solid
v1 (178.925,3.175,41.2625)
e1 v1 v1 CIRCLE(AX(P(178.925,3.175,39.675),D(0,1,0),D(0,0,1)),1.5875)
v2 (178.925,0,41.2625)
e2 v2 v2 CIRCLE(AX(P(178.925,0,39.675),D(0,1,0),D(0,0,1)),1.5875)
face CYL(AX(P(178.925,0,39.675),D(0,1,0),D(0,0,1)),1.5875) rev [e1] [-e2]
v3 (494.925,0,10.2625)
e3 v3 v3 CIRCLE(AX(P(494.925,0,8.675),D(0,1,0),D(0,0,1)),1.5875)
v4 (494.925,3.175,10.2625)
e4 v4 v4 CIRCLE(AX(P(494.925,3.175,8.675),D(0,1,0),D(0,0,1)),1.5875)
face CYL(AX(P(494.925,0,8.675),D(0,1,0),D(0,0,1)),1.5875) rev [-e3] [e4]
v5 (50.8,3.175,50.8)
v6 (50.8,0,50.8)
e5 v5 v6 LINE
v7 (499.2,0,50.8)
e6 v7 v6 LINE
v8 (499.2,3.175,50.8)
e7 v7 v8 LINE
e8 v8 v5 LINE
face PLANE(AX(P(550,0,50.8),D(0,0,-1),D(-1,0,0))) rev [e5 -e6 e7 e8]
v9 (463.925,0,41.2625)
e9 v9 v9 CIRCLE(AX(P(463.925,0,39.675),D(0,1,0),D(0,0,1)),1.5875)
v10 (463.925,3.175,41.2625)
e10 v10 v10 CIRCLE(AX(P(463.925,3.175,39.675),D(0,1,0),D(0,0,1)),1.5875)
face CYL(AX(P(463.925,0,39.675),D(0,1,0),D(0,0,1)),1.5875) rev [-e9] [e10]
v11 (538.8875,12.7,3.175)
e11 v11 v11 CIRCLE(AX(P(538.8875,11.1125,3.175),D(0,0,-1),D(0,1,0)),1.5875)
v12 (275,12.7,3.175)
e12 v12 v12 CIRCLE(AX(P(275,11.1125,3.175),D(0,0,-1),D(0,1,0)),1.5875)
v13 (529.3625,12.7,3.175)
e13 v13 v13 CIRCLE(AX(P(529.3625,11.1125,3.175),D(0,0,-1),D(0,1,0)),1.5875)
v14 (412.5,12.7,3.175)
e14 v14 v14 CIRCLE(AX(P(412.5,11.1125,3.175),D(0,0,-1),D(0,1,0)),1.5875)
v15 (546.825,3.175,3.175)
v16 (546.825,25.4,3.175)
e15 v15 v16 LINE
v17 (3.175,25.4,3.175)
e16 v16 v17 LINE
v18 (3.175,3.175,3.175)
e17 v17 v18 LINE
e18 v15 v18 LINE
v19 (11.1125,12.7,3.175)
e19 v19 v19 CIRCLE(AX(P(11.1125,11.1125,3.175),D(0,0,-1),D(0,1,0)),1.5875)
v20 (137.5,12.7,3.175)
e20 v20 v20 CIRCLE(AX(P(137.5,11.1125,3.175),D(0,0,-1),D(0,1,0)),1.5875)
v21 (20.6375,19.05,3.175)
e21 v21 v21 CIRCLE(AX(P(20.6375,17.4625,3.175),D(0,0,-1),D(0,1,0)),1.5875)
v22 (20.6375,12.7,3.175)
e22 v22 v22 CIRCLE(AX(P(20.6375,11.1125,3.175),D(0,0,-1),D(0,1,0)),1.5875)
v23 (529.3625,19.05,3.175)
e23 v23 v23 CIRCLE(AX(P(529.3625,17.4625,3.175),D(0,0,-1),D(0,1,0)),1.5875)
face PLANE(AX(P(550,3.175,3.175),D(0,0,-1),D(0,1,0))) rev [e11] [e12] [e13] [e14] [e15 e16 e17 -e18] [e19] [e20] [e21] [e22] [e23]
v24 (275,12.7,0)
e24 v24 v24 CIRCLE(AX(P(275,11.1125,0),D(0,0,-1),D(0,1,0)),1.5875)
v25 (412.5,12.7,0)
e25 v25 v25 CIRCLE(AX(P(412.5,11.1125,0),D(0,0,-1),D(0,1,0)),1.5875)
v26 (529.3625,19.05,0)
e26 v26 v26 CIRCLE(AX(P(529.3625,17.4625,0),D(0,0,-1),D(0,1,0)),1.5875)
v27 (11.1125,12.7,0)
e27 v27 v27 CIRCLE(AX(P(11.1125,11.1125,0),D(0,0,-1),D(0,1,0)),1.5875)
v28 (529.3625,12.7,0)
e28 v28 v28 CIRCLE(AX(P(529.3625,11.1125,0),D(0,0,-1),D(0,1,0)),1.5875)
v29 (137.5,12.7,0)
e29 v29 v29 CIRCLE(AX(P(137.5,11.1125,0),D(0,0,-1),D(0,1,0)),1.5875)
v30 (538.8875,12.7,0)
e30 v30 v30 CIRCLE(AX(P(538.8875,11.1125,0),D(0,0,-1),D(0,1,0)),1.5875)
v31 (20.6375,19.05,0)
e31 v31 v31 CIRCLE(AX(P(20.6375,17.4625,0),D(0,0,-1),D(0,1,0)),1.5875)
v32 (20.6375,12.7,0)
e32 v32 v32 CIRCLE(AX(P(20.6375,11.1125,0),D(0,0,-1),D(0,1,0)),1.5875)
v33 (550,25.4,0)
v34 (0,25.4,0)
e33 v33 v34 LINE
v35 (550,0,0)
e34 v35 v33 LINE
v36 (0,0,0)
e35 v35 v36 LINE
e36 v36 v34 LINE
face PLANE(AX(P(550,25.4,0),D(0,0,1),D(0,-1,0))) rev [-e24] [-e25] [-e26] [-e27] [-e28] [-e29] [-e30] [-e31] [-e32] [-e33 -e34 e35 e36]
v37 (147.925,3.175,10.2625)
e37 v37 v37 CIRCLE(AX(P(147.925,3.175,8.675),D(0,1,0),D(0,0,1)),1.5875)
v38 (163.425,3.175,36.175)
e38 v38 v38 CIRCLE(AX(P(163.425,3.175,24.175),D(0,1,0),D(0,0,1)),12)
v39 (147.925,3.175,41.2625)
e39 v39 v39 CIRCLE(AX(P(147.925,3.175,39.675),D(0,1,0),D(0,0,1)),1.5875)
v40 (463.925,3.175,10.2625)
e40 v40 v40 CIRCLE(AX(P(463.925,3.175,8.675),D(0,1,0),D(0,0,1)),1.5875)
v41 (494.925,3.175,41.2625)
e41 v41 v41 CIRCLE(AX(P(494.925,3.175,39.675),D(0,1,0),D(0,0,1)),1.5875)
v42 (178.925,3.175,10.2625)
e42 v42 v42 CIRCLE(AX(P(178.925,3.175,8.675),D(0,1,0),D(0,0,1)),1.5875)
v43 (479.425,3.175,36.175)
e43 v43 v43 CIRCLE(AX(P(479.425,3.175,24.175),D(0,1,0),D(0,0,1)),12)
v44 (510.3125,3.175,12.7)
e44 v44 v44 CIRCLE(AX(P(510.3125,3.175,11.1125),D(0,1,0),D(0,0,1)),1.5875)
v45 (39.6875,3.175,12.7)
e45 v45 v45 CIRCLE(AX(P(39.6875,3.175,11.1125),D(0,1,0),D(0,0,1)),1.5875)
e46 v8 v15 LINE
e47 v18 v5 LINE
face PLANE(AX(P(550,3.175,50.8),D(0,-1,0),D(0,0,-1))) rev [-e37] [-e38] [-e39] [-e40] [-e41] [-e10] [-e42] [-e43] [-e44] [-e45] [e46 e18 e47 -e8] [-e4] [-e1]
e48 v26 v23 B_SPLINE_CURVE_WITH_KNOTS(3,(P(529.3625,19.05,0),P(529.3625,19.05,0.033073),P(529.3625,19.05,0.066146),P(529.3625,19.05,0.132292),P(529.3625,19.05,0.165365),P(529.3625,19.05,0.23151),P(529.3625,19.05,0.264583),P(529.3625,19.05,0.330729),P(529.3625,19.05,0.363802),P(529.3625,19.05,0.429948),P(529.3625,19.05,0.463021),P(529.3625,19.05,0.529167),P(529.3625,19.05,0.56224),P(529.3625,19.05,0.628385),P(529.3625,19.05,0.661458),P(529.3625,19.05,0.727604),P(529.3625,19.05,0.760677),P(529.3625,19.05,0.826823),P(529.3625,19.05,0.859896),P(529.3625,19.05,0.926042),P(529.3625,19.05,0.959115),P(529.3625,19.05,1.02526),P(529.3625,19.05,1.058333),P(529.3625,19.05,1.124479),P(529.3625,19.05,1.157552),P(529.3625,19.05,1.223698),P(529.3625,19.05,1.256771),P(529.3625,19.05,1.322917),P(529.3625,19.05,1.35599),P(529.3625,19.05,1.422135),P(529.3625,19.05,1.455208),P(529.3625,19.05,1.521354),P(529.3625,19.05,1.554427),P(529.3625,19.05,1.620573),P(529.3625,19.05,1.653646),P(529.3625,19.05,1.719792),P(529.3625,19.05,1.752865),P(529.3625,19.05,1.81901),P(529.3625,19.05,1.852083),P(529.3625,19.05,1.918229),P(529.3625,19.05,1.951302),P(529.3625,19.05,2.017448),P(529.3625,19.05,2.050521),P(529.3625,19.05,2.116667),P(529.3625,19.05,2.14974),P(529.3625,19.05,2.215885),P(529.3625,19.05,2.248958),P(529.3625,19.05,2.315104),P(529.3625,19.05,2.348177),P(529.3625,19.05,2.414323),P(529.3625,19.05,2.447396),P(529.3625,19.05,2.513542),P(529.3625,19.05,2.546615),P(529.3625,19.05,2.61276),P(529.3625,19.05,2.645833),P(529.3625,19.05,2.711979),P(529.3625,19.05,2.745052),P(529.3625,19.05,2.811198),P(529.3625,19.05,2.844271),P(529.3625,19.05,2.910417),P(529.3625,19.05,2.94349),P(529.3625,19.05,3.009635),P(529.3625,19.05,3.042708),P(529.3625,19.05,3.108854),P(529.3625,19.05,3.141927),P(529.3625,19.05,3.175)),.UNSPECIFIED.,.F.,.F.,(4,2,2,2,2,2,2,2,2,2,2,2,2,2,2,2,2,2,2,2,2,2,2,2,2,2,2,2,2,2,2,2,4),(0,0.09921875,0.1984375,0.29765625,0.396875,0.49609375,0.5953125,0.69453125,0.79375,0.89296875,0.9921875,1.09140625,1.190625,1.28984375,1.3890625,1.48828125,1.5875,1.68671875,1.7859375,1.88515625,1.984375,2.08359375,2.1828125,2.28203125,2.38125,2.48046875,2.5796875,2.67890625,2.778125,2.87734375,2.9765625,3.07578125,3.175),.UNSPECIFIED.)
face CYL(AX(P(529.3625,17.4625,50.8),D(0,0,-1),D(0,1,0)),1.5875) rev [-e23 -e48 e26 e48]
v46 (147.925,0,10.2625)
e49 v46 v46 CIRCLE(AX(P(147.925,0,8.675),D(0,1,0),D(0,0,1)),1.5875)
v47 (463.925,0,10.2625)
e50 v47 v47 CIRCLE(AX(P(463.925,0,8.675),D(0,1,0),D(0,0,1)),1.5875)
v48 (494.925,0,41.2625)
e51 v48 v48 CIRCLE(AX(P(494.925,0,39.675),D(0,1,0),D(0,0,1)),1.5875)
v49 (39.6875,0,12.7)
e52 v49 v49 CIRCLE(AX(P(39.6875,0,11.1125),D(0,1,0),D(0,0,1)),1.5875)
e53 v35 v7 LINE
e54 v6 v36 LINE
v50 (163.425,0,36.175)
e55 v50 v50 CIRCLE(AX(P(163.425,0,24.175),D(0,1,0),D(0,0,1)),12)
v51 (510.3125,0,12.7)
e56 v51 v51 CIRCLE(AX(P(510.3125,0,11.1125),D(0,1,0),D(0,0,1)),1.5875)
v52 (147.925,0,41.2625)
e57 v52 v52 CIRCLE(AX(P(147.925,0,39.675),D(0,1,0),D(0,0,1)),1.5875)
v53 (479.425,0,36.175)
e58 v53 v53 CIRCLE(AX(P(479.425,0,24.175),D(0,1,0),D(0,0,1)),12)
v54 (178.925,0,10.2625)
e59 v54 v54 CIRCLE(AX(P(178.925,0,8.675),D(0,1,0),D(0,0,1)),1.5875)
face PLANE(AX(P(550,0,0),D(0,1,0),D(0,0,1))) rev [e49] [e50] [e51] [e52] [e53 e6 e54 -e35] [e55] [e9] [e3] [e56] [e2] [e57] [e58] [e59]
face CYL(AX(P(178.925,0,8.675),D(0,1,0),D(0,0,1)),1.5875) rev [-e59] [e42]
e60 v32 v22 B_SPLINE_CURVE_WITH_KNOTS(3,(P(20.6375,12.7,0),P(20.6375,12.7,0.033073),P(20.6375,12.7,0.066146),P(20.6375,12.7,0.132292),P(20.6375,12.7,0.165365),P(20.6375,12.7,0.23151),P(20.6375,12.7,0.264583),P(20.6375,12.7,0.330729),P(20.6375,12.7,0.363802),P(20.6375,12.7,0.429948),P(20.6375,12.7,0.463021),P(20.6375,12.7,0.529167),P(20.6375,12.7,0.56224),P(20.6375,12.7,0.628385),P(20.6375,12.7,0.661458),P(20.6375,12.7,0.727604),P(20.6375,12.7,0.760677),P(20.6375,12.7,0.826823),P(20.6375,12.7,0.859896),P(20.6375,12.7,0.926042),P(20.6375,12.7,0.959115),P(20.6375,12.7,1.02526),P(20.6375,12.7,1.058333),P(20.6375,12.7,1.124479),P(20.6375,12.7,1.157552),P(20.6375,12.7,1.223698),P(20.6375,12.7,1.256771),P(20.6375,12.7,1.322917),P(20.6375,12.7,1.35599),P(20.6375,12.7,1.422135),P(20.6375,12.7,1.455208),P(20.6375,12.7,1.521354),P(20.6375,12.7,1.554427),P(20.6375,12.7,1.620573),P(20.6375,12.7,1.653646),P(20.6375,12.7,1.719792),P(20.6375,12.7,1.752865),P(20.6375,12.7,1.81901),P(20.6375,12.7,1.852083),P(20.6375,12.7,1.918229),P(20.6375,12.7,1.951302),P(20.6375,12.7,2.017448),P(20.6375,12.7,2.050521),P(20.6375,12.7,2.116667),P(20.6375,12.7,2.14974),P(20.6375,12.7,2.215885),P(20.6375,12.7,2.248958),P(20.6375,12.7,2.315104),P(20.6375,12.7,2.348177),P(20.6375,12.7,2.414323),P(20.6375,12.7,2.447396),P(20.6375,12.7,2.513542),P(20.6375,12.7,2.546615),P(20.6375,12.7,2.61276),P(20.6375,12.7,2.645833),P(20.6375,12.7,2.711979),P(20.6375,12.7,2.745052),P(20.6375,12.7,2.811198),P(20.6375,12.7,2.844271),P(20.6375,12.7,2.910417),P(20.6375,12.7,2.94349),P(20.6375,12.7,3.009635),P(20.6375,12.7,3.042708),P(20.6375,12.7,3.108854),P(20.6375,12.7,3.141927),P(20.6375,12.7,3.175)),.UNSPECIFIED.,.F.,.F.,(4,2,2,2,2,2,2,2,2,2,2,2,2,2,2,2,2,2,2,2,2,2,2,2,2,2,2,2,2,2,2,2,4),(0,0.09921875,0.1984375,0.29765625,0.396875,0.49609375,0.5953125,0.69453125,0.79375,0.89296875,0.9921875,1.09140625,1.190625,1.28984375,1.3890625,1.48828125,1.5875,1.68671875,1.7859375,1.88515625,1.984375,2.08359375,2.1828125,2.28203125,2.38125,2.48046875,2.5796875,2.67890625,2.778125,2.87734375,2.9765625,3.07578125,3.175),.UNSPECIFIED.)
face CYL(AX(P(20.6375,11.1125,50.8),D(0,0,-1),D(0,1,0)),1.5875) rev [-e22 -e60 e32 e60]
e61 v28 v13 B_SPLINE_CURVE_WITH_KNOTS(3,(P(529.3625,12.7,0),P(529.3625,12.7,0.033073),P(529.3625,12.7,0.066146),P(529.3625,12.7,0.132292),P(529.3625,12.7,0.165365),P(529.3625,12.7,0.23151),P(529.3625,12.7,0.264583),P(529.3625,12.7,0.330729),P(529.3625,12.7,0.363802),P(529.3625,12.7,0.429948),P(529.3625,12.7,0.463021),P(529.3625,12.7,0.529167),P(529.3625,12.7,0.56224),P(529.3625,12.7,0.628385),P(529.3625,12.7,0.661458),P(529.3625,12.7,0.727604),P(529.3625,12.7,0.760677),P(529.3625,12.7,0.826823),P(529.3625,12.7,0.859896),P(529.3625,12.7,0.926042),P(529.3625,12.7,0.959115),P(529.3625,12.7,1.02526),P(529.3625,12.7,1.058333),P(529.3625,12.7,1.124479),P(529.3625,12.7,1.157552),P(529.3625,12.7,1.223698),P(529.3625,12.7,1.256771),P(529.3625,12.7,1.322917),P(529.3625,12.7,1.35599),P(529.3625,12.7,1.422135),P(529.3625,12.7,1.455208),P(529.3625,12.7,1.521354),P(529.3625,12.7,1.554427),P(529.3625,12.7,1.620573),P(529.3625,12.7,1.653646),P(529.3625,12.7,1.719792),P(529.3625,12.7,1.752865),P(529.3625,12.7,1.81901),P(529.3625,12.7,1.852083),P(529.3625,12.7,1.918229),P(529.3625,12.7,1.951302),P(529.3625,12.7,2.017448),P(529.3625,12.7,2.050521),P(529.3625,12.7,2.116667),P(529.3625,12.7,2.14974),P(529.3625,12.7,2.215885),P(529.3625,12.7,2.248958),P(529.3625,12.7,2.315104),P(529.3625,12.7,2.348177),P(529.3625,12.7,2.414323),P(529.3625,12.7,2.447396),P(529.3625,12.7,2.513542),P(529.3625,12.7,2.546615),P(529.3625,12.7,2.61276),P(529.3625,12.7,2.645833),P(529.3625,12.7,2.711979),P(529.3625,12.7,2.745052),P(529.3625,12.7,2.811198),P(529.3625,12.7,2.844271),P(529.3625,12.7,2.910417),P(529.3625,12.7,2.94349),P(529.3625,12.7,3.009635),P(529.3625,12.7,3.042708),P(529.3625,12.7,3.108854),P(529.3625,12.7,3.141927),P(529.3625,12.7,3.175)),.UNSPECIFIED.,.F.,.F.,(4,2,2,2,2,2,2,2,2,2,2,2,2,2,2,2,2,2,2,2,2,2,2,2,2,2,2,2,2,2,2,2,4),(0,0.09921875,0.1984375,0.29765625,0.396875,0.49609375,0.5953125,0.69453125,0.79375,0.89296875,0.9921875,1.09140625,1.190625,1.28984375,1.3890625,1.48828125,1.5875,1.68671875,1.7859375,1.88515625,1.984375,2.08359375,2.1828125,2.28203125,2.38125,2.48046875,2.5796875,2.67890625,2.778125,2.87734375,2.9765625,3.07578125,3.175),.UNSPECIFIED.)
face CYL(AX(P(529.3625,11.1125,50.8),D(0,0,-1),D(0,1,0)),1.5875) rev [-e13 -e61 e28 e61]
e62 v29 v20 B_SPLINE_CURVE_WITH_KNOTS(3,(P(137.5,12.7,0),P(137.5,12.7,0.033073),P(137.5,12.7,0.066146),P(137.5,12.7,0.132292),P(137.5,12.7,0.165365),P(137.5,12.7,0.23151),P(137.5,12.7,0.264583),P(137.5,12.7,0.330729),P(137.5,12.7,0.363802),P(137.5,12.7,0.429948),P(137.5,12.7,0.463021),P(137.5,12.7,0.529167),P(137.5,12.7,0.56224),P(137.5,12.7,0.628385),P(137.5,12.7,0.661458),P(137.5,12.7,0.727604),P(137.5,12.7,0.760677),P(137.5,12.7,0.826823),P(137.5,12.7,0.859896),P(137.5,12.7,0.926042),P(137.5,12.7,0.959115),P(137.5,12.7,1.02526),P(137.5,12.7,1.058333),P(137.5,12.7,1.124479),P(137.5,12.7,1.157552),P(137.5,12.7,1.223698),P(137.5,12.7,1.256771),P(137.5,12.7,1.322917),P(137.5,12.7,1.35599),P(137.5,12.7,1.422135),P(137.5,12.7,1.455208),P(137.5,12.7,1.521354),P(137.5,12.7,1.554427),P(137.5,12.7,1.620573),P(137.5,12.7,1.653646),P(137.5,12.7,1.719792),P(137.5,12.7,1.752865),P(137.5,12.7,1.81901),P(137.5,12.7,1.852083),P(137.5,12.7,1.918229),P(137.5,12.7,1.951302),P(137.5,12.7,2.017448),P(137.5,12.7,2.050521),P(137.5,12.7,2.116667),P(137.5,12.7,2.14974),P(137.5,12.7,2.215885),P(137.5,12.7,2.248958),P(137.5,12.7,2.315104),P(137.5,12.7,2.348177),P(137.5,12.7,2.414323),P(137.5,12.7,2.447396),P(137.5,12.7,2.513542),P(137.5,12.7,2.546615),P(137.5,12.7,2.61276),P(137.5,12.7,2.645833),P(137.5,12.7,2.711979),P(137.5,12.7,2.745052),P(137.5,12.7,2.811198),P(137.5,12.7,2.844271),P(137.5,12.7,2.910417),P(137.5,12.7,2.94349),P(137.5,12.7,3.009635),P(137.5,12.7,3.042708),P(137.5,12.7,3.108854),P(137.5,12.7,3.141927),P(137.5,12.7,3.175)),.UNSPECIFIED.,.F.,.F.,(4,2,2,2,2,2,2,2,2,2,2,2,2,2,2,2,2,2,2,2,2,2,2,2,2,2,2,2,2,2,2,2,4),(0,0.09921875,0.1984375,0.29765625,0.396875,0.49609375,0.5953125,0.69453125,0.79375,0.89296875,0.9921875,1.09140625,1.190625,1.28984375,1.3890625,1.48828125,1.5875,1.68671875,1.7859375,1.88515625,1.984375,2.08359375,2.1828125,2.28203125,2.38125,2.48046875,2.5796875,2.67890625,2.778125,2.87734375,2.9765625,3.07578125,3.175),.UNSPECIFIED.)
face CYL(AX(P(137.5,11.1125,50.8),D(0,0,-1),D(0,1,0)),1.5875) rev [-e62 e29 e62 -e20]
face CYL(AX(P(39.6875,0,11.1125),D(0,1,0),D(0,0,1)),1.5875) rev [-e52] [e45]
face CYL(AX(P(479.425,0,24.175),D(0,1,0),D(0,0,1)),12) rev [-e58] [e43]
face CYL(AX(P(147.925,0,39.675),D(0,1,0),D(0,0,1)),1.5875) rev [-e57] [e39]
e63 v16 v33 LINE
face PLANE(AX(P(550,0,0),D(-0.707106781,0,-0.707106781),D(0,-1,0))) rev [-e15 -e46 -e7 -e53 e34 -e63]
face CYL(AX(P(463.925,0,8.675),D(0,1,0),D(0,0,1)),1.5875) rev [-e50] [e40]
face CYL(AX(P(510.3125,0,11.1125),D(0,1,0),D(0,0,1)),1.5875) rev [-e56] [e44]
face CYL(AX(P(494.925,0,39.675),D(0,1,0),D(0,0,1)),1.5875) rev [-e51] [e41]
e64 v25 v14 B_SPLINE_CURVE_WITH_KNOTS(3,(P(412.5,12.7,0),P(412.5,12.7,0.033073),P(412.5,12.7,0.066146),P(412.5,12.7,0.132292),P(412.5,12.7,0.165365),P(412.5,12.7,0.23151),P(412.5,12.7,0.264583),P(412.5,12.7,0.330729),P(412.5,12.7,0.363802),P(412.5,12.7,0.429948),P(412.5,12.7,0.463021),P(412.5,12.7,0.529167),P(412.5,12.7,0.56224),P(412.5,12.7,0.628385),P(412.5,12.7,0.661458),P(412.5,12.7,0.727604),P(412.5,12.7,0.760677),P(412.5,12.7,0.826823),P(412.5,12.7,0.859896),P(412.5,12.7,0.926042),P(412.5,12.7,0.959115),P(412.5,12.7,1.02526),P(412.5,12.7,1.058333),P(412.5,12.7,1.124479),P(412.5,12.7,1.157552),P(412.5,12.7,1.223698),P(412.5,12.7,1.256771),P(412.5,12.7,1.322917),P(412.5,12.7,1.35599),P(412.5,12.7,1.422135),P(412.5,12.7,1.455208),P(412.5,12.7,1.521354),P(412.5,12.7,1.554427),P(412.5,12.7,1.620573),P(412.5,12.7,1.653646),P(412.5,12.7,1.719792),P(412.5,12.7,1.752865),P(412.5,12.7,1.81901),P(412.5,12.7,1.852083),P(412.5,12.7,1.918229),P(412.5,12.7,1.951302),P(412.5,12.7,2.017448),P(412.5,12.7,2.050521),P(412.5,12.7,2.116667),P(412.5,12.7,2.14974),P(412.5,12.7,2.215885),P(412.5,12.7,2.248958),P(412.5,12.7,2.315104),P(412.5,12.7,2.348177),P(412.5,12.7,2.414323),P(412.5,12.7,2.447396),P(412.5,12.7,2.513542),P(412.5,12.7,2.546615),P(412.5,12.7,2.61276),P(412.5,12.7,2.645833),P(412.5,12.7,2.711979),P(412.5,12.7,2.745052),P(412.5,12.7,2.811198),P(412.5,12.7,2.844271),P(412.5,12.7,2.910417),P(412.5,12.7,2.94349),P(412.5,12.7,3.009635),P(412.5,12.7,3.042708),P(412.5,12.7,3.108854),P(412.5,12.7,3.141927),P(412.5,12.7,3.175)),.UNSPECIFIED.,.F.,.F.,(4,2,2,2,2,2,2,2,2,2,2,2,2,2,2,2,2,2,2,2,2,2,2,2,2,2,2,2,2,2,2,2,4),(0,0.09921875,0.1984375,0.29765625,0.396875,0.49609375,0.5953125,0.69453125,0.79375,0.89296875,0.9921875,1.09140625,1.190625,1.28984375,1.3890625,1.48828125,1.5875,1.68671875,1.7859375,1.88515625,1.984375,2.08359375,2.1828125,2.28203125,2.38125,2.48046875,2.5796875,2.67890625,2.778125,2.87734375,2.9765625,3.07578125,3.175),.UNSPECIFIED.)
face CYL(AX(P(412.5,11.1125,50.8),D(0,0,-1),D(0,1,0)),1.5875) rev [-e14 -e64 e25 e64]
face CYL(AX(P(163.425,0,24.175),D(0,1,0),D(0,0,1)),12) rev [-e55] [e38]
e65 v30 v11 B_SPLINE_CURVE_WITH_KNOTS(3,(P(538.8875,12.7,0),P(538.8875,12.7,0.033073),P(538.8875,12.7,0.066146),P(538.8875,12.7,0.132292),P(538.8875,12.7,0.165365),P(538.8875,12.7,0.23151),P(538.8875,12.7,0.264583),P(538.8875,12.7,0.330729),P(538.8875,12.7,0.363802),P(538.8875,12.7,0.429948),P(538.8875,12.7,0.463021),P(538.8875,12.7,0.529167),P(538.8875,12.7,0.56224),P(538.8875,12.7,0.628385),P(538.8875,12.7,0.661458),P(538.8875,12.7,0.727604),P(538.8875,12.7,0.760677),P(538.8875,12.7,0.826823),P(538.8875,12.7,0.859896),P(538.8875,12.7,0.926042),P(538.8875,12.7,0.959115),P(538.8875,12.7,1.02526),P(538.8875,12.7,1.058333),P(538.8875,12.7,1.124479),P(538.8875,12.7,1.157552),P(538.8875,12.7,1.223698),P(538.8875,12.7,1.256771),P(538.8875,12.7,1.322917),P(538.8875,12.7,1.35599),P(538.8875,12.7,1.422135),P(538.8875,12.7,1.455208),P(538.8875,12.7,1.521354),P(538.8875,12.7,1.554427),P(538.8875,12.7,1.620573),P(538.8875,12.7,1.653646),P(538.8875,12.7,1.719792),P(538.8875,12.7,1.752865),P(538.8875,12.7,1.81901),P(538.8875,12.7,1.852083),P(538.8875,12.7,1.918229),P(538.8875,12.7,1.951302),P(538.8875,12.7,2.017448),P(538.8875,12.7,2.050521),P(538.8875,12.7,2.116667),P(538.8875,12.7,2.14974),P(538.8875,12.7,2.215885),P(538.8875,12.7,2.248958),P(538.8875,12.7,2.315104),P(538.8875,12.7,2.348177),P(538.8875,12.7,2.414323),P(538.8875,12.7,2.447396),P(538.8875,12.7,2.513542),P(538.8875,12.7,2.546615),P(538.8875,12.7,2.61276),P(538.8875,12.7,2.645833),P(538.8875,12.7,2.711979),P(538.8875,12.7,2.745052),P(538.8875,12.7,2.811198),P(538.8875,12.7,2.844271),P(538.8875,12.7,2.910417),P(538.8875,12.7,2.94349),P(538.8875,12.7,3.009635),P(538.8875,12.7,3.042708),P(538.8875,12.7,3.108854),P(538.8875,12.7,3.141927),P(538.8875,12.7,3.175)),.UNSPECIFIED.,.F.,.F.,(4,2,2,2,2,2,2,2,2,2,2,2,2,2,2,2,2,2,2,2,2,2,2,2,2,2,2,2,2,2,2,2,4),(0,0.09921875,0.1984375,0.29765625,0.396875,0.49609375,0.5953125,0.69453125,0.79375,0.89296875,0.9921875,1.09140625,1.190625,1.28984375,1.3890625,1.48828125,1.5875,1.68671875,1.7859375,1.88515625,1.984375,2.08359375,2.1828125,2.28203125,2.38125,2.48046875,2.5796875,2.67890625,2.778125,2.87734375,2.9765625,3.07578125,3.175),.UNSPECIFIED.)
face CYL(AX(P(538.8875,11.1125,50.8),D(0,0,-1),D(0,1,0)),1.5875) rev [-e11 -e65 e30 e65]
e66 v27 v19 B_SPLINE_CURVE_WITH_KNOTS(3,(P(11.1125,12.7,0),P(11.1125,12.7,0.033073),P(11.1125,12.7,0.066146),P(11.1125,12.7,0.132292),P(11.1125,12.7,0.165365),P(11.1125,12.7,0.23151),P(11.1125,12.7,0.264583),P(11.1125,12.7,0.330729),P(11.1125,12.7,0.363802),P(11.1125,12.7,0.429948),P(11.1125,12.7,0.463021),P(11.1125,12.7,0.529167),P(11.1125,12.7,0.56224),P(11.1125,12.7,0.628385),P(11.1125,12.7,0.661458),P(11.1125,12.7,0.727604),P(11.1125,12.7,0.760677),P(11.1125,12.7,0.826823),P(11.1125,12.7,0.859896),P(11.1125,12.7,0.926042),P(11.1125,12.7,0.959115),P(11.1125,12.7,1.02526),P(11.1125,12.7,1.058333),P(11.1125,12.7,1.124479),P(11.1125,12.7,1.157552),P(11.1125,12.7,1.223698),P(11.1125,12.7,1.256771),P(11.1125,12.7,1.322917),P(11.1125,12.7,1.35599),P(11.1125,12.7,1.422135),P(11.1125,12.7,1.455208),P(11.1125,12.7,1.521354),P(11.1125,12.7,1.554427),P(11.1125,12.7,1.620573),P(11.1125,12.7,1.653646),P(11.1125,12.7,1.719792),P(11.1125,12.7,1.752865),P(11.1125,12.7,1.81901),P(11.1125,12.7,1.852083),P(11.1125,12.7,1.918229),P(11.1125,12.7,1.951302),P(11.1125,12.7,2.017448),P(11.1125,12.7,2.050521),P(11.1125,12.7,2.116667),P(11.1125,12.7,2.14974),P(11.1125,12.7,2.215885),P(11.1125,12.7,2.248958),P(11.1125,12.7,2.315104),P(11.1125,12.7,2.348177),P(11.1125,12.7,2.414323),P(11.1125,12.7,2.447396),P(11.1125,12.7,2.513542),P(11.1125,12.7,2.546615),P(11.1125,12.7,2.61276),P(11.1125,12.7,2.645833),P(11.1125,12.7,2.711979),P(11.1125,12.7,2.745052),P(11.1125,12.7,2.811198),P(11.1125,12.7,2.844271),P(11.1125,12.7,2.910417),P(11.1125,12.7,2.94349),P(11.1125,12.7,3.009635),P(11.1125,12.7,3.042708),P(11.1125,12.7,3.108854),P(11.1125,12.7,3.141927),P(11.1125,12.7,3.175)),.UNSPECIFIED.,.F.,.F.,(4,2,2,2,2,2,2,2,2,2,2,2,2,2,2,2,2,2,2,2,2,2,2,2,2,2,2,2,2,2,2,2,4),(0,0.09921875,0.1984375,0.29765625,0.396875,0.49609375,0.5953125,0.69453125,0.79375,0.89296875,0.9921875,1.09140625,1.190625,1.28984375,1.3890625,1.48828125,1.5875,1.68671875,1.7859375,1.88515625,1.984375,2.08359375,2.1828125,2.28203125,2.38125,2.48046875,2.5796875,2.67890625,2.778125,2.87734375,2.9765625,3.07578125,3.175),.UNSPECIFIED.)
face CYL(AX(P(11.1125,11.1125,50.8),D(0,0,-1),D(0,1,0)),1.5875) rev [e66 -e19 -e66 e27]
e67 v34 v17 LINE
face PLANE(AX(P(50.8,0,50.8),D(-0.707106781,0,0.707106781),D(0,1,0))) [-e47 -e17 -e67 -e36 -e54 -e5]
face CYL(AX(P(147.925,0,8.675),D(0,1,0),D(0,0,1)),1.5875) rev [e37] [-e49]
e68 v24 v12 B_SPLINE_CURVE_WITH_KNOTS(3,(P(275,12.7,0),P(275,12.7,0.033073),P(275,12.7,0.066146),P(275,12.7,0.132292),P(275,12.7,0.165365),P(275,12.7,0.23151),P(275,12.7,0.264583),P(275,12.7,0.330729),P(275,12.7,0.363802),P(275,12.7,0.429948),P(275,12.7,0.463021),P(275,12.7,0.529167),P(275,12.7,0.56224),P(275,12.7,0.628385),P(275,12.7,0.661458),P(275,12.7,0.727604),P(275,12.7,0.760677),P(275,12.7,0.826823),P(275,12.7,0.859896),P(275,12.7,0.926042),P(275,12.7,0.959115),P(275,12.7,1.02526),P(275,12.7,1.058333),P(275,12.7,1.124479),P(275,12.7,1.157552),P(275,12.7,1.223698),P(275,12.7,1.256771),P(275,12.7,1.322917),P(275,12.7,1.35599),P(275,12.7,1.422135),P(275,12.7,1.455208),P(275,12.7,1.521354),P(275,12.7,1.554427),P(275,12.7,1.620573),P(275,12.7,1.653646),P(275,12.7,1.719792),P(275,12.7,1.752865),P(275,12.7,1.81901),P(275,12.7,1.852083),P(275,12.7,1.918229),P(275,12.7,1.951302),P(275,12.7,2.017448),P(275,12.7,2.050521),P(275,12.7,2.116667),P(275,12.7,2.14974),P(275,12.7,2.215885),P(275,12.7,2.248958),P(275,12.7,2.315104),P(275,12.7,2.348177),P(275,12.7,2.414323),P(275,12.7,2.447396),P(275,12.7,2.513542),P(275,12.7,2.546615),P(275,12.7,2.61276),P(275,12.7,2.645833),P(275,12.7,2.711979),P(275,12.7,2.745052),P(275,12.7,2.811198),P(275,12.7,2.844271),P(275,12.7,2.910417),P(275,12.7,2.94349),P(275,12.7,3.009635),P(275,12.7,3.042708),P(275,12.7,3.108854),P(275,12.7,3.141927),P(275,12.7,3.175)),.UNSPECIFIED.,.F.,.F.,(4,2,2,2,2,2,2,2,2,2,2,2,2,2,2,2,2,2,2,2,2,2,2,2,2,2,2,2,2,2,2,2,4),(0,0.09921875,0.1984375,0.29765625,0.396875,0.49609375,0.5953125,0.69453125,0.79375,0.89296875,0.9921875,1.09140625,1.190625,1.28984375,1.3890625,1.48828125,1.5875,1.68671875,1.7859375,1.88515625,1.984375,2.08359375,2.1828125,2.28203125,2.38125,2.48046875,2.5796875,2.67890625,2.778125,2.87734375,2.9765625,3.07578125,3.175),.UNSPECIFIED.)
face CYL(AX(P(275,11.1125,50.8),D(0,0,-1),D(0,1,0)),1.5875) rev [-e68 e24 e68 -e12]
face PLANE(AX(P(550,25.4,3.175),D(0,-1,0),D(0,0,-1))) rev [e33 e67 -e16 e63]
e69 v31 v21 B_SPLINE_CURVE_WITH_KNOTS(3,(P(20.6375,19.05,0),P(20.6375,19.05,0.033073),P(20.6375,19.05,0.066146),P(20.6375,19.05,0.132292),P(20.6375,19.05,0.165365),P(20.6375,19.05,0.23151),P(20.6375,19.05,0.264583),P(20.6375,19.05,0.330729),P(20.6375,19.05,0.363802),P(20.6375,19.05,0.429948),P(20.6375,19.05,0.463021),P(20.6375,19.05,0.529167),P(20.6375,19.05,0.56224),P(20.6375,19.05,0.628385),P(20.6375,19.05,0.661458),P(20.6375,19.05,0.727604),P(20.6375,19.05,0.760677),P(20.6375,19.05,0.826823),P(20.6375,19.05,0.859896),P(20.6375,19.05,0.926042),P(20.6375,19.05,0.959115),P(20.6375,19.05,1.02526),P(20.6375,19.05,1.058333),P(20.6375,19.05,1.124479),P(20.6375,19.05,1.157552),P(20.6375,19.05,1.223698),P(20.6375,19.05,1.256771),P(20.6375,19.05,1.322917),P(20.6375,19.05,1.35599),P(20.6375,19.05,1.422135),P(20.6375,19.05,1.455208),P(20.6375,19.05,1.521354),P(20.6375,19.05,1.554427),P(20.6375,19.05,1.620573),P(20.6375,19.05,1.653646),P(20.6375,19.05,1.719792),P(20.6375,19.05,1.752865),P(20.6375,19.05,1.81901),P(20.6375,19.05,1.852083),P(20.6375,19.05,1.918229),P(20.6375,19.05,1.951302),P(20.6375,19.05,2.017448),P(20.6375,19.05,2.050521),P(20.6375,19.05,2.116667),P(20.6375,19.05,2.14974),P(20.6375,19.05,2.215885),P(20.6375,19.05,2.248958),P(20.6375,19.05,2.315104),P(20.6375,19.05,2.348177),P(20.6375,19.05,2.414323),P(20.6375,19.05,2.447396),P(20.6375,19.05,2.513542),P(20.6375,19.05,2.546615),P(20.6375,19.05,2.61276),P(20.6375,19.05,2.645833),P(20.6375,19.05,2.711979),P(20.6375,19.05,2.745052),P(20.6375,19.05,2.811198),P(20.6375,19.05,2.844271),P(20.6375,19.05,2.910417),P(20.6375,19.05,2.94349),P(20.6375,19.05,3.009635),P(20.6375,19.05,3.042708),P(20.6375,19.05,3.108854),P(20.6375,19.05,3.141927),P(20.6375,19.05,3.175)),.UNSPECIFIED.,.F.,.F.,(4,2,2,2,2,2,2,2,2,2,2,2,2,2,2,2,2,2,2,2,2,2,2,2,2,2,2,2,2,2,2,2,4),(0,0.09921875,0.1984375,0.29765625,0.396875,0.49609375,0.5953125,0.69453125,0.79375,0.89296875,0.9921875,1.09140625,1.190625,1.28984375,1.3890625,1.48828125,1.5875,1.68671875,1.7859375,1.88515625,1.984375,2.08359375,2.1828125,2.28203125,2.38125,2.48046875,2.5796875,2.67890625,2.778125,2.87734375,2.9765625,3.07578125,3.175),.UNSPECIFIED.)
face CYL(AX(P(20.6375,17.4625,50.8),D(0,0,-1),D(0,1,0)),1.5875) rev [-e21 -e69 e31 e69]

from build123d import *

# Parameters (mm, degrees)
BOSS_EXTRUDE1_DEPTH               = 550
CHAMFER7_SIZE                     = 50.8
CHAMFER8_SIZE                     = 50.8
BOTTHOMHOLES_SKETCH2_R            = 12
BOTTHOMHOLES_SKETCH2_R_2          = 1.5875
BOTTOMHOLES_CUT_EXTRUDE1_DEPTH    = 553.788015993
RIGHTSIDEHOLES_SKETCH3_R          = 1.5875
RIGHTSIDEHOLES_CUT_EXTRUDE2_DEPTH = 553.924768843


with BuildPart() as part:
    # Sketch1 → Boss-Extrude1 (new body)
    with BuildSketch(Plane(origin=(0, 0, 0), x_dir=(0, 0, -1), z_dir=(1, 0, 0))):
        Polygon((0, 0), (-50.8, 0), (-50.8, 3.175), (-3.175, 3.175), (-3.175, 25.4), (0, 25.4), align=None)
    extrude(amount=BOSS_EXTRUDE1_DEPTH)

    # Chamfer7
    chamfer7_edges = [part.edges().sort_by_distance(p)[0] for p in [
        (0, 1.5875, 50.8),
    ]]
    chamfer(chamfer7_edges, length=CHAMFER7_SIZE - 0.0001)  # a hair under: the kernel refuses the full size

    # Chamfer8
    chamfer8_edges = [part.edges().sort_by_distance(p)[0] for p in [
        (550, 1.5875, 50.8),
    ]]
    chamfer(chamfer8_edges, length=CHAMFER8_SIZE - 0.0001)  # a hair under: the kernel refuses the full size

    # BotthomHoles-Sketch2 → BottomHoles-Cut-Extrude1 (cut, through all)
    with BuildSketch(Plane(origin=(0, 3.175, 0), x_dir=(1, 0, 0), z_dir=(0, 1, 0))):
        with Locations(Location((479.425, -24.175, 0), (0, 0, 270))):
            Circle(BOTTHOMHOLES_SKETCH2_R)
        with Locations(Location((463.925, -8.675, 0), (0, 0, 270))):
            Circle(BOTTHOMHOLES_SKETCH2_R_2)
        with Locations(Location((494.925, -8.675, 0), (0, 0, 270))):
            Circle(BOTTHOMHOLES_SKETCH2_R_2)
        with Locations(Location((463.925, -39.675, 0), (0, 0, 270))):
            Circle(BOTTHOMHOLES_SKETCH2_R_2)
        with Locations(Location((494.925, -39.675, 0), (0, 0, 270))):
            Circle(BOTTHOMHOLES_SKETCH2_R_2)
        with Locations(Location((39.6875, -11.1125, 0), (0, 0, 270))):
            Circle(BOTTHOMHOLES_SKETCH2_R_2)
        with Locations(Location((510.3125, -11.1125, 0), (0, 0, 270))):
            Circle(BOTTHOMHOLES_SKETCH2_R_2)
        with Locations(Location((178.925, -39.675, 0), (0, 0, 270))):
            Circle(BOTTHOMHOLES_SKETCH2_R_2)
        with Locations(Location((147.925, -39.675, 0), (0, 0, 270))):
            Circle(BOTTHOMHOLES_SKETCH2_R_2)
        with Locations(Location((178.925, -8.675, 0), (0, 0, 270))):
            Circle(BOTTHOMHOLES_SKETCH2_R_2)
        with Locations(Location((147.925, -8.675, 0), (0, 0, 270))):
            Circle(BOTTHOMHOLES_SKETCH2_R_2)
        with Locations(Location((163.425, -24.175, 0), (0, 0, 270))):
            Circle(BOTTHOMHOLES_SKETCH2_R)
    extrude(amount=-BOTTOMHOLES_CUT_EXTRUDE1_DEPTH, mode=Mode.SUBTRACT)

    # RightSideHoles-Sketch3 → RightSideHoles-Cut-Extrude2 (cut, through all)
    with BuildSketch(Plane(origin=(0, 0, 0), x_dir=(-1, 0, 0), z_dir=(0, 0, -1))):
        with Locations(Location((-529.3625, 17.4625, 0), (0, 0, 90))):
            Circle(RIGHTSIDEHOLES_SKETCH3_R)
        with Locations(Location((-538.8875, 11.1125, 0), (0, 0, 90))):
            Circle(RIGHTSIDEHOLES_SKETCH3_R)
        with Locations(Location((-529.3625, 11.1125, 0), (0, 0, 90))):
            Circle(RIGHTSIDEHOLES_SKETCH3_R)
        with Locations(Location((-11.1125, 11.1125, 0), (0, 0, 90))):
            Circle(RIGHTSIDEHOLES_SKETCH3_R)
        with Locations(Location((-20.6375, 11.1125, 0), (0, 0, 90))):
            Circle(RIGHTSIDEHOLES_SKETCH3_R)
        with Locations(Location((-20.6375, 17.4625, 0), (0, 0, 90))):
            Circle(RIGHTSIDEHOLES_SKETCH3_R)
        with Locations(Location((-412.5, 11.1125, 0), (0, 0, 90))):
            Circle(RIGHTSIDEHOLES_SKETCH3_R)
        with Locations(Location((-275, 11.1125, 0), (0, 0, 90))):
            Circle(RIGHTSIDEHOLES_SKETCH3_R)
        with Locations(Location((-137.5, 11.1125, 0), (0, 0, 90))):
            Circle(RIGHTSIDEHOLES_SKETCH3_R)
    extrude(amount=-RIGHTSIDEHOLES_CUT_EXTRUDE2_DEPTH, mode=Mode.SUBTRACT)


solid = part.part
